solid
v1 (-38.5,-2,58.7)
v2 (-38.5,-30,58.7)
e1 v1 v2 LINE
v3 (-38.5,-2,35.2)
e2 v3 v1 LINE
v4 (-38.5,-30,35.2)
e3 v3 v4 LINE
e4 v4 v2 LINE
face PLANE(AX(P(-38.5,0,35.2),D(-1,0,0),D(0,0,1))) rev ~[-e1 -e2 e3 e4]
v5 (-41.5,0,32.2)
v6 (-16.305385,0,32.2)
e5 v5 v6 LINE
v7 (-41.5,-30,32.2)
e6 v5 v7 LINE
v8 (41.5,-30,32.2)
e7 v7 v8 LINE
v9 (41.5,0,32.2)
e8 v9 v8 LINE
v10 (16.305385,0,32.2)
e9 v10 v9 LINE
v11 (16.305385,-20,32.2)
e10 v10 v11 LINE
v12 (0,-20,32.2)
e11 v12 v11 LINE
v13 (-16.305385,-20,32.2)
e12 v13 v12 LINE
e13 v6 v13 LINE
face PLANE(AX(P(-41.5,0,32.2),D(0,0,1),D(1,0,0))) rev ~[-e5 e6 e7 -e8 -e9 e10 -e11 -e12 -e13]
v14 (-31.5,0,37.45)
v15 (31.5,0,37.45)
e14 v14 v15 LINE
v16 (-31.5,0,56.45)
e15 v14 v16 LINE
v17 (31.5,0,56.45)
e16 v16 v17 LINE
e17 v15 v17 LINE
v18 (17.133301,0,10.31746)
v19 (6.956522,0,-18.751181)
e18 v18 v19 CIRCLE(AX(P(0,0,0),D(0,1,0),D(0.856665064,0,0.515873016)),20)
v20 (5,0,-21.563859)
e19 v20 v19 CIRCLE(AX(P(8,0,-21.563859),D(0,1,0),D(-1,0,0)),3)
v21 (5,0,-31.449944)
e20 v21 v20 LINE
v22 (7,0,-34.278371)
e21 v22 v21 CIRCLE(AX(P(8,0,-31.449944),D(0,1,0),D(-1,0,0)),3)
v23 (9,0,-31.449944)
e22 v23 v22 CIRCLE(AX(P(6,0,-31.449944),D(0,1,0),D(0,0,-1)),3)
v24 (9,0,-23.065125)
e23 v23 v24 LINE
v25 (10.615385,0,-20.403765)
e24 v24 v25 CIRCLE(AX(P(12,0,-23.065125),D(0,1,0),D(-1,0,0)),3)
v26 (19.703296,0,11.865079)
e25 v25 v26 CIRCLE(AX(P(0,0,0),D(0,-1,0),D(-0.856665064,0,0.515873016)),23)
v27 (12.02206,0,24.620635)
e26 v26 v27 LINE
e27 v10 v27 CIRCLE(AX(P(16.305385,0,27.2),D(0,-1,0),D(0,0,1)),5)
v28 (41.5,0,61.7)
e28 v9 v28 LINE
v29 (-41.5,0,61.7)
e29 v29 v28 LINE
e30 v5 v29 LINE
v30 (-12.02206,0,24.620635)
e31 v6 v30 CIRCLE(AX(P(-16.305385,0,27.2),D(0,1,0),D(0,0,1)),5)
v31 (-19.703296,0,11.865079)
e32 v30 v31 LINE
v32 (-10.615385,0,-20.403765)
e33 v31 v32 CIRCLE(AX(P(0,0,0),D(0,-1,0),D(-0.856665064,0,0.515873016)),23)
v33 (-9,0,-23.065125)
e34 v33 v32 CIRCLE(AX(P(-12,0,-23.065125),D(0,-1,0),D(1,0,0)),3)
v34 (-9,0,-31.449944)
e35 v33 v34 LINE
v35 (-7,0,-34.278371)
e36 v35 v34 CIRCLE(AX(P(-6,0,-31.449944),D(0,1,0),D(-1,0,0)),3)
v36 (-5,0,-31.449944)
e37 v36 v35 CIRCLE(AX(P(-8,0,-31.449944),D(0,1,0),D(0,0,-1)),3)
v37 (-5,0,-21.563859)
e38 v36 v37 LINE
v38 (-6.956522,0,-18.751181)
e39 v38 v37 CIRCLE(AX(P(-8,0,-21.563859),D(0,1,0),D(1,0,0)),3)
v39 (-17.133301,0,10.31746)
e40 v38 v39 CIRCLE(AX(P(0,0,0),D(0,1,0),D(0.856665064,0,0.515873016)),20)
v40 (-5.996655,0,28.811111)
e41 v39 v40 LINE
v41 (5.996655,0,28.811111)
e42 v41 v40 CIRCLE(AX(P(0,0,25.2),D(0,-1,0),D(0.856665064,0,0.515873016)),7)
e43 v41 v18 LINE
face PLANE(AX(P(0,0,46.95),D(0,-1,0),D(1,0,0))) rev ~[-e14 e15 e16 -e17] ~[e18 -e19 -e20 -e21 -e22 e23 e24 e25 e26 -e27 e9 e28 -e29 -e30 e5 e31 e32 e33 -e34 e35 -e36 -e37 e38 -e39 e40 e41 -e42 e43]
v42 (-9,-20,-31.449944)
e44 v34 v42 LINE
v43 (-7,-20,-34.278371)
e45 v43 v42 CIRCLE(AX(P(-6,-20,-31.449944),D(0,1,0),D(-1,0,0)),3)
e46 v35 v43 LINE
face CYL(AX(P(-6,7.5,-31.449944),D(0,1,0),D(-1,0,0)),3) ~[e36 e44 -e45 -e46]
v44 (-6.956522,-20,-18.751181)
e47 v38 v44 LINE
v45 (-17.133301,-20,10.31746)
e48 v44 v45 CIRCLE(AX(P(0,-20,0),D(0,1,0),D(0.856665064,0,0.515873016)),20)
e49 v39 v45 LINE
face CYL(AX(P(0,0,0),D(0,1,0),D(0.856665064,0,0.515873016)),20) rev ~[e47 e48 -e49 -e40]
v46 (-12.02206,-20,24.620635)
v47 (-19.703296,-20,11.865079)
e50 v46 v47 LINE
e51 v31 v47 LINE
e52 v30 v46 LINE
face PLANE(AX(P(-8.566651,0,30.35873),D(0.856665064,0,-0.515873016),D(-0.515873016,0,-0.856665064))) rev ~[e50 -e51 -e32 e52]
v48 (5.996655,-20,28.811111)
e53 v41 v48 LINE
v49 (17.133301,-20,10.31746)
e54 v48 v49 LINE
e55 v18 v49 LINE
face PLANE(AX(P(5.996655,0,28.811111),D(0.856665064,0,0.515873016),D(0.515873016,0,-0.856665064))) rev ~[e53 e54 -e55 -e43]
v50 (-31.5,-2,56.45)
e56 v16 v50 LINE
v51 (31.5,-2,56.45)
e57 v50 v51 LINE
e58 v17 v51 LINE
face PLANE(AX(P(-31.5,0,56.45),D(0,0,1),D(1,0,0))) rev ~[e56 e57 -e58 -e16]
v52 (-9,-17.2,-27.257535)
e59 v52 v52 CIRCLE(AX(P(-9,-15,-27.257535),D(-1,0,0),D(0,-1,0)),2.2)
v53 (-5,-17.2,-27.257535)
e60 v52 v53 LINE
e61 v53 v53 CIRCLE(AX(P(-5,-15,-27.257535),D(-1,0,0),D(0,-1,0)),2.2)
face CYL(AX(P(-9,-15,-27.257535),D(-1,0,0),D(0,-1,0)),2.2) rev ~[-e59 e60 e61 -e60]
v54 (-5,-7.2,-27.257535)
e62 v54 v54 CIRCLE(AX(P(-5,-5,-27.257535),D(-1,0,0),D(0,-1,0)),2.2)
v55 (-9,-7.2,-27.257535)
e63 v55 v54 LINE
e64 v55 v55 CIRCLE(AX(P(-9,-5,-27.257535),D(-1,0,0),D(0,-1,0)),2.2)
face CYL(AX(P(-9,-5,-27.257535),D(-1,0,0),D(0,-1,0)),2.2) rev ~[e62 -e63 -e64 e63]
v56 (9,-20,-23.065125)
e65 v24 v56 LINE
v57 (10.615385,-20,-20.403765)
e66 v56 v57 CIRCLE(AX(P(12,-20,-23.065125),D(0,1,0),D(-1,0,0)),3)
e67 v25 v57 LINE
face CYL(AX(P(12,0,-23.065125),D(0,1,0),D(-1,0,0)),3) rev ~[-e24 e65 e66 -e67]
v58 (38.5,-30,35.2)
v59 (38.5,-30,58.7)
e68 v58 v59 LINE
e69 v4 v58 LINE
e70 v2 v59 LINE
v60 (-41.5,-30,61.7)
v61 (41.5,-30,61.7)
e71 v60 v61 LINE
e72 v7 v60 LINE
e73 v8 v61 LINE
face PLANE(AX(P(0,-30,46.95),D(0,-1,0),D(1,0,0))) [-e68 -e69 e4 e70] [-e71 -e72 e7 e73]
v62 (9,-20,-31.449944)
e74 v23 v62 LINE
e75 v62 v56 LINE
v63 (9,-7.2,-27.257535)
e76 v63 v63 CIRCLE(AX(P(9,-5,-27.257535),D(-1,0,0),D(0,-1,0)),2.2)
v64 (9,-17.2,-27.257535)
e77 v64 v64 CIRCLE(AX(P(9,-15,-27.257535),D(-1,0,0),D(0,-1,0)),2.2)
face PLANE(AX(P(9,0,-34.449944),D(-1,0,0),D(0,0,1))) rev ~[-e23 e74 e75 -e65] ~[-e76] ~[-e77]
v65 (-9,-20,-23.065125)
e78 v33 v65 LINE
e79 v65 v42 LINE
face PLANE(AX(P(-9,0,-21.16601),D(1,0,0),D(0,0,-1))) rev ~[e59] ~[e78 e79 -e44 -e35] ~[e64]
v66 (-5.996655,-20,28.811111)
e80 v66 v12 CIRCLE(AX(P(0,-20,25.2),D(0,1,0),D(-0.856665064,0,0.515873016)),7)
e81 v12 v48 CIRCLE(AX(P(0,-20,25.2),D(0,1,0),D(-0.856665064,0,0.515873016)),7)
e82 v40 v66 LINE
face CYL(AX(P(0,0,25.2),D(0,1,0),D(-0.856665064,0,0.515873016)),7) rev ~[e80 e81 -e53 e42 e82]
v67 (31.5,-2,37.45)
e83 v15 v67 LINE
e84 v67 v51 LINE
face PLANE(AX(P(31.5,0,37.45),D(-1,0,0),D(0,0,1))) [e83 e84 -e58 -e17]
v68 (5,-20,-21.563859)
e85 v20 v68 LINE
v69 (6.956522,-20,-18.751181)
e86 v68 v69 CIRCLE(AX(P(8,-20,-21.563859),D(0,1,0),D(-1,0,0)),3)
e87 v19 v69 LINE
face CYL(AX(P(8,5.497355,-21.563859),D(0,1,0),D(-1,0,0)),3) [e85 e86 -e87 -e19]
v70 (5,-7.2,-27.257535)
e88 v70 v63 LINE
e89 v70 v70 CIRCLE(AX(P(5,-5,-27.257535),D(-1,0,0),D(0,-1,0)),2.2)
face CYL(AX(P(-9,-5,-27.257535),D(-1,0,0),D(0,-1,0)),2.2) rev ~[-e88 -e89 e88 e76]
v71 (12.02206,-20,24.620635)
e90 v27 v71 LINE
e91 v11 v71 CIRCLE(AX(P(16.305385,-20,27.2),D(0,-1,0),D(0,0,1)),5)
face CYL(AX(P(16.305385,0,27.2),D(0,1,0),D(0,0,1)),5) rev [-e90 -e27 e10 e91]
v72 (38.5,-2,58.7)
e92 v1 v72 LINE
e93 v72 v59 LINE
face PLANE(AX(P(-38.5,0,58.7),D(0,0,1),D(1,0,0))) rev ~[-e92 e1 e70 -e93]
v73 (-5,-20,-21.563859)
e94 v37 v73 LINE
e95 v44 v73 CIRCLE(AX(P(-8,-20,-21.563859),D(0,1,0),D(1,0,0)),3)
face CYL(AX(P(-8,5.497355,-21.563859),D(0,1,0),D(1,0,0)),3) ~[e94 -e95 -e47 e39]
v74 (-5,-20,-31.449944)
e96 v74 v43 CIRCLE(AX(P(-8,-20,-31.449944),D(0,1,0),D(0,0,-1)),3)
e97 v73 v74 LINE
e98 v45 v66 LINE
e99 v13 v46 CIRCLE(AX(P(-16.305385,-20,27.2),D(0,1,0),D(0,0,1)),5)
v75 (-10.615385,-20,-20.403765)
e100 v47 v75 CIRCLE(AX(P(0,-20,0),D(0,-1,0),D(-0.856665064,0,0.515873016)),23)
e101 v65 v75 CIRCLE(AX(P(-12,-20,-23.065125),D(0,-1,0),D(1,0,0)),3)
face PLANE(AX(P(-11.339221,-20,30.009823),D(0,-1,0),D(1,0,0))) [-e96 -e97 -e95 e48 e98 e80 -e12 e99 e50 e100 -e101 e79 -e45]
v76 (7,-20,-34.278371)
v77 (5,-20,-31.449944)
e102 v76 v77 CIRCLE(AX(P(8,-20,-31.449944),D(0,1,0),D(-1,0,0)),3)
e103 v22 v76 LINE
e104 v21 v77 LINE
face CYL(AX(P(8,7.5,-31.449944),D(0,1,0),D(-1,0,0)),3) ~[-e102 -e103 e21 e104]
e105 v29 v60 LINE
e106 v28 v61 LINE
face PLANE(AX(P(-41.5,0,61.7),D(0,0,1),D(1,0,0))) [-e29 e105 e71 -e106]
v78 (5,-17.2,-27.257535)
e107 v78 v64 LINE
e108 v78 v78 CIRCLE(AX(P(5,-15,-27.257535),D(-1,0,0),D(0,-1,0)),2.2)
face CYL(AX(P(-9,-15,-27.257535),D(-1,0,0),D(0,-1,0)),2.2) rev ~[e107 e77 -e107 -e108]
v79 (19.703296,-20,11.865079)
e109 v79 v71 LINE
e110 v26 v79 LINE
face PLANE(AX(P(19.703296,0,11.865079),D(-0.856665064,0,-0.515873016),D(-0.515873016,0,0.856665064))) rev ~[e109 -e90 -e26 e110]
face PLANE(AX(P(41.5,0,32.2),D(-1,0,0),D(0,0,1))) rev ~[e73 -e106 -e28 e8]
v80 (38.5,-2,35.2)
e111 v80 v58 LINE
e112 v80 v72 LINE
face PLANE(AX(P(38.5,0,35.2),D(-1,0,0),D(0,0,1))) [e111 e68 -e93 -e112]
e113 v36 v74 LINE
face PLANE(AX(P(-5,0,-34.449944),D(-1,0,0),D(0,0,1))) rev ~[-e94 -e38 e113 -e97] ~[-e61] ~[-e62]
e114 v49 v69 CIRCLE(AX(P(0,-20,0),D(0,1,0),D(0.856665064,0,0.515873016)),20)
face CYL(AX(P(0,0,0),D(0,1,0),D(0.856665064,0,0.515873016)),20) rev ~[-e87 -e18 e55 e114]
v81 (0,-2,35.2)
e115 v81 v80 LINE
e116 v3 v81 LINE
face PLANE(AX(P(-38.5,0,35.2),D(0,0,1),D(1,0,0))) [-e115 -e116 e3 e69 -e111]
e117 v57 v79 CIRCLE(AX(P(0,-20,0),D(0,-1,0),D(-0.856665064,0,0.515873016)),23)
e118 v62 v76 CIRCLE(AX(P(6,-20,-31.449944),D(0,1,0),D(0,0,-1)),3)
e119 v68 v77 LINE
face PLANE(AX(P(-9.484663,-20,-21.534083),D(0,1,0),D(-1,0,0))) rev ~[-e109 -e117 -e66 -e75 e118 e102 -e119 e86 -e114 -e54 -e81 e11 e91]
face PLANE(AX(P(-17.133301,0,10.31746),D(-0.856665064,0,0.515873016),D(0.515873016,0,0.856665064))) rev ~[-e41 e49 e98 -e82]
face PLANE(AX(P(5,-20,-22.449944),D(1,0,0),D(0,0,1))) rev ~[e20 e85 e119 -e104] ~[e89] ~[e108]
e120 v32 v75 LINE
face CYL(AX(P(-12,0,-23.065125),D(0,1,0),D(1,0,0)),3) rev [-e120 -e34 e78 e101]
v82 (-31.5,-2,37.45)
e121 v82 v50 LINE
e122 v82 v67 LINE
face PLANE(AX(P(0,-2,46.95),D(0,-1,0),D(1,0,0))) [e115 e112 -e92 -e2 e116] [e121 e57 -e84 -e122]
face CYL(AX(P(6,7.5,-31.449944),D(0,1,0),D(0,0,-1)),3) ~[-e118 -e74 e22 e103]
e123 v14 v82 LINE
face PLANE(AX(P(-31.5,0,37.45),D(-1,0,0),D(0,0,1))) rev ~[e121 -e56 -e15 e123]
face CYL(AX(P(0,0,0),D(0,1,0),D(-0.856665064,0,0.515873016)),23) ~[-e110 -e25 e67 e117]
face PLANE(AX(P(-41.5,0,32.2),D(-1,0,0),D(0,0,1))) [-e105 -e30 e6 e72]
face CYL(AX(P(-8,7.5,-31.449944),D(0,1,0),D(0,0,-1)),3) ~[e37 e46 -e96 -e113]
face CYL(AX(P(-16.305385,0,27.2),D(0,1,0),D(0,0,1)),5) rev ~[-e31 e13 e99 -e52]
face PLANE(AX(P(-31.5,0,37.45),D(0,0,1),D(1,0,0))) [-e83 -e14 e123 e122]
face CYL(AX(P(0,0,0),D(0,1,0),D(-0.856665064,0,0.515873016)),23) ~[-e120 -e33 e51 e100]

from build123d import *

# Parameters (mm, degrees)
F1_DEPTH    = 20
F3_DEPTH    = 20.001
F5_DEPTH    = 20
F6_T1_DEPTH = 20
F6_T3_DEPTH = 30.9947096091
F6_T5_DEPTH = 35
F7_W        = 83
F7_H        = 29.5
F7_W_2      = 77
F7_H_2      = 23.5
F8_DEPTH    = 30
F9_T1_DEPTH = 20
F10_R       = 2.2
F11_DEPTH   = 50.501
F12_W       = 77
F12_H       = 23.5
F12_W_2     = 63
F12_H_2     = 19
F13_DEPTH   = 2


# Not quite as in the source:
# - a fillet or chamfer that OpenCascade refuses, or shapes differently, is made with other operations: its cross-section is extruded or revolved along the edge and cut away or added


with BuildPart() as f1:
    # F0 (on Front) → F1 (new body)
    with BuildSketch(Plane.XZ):
        with BuildLine():
            ThreePointArc((8.5666506378, 30.3587301587), (0, 35.2), (-8.5666506378, 30.3587301587))
            Line((-8.5666506378, 30.3587301587), (-19.7032964668, 11.8650793651))
            ThreePointArc((-19.7032964668, 11.8650793651), (0, -23), (19.7032964668, 11.8650793651))
            Line((19.7032964668, 11.8650793651), (8.5666506378, 30.3587301587))
        make_face()
        with BuildLine():
            ThreePointArc((17.1333012755, 10.3174603175), (0, -20), (-17.1333012755, 10.3174603175))
            Line((-17.1333012755, 10.3174603175), (-5.9966554464, 28.8111111111))
            ThreePointArc((-5.9966554464, 28.8111111111), (0, 32.2), (5.9966554464, 28.8111111111))
            Line((5.9966554464, 28.8111111111), (17.1333012755, 10.3174603175))
        make_face(mode=Mode.SUBTRACT)
    extrude(amount=F1_DEPTH)

    # F2 (on face) → F3 (cut, through all)
    with BuildSketch(Plane.XZ.offset(20)):
        with BuildLine():
            ThreePointArc((5, -19.364916731), (0, -20), (-5, -19.364916731))
            Line((-5, -19.364916731), (-5, -22.4499443206))
            ThreePointArc((-5, -22.4499443206), (0, -23), (5, -22.4499443206))
            Line((5, -22.4499443206), (5, -19.364916731))
        make_face()
    extrude(amount=-F3_DEPTH, mode=Mode.SUBTRACT)

    # F4 (on Front) → F5 (join, through all)
    with BuildSketch(Plane.XZ):
        Polygon((-5, -34.4499443206), (-5, -22.4499443206), (-9, -21.1660104885), (-9, -34.4499443206), align=None)
        Polygon((5, -34.4499443206), (9, -34.4499443206), (9, -21.1660104885), (5, -22.4499443206), align=None)
    extrude(amount=F5_DEPTH)

    # F6: fillet of radius 3 on 8 edges, made by hand

    # F6_s2 → F6_t1 (join)
    with BuildSketch(Plane.XZ):
        with BuildLine():
            ThreePointArc((-9, -23.0651251893), (-9.4354487572, -21.5085016244), (-10.6153846154, -20.4037645906))
            ThreePointArc((-10.6153846154, -20.4037645906), (-9.8150946559, -20.8005749174), (-9, -21.1660104885))
            Line((-9, -21.1660104885), (-9, -23.0651251893))
        make_face()
        with BuildLine():
            ThreePointArc((9, -23.0651251893), (9.4354487572, -21.5085016244), (10.6153846154, -20.4037645906))
            ThreePointArc((10.6153846154, -20.4037645906), (9.8150946559, -20.8005749174), (9, -21.1660104885))
            Line((9, -21.1660104885), (9, -23.0651251893))
        make_face()
    extrude(amount=F6_T1_DEPTH)

    # F6_s4 → F6_t3 (cut)
    with BuildSketch(Plane.XZ.offset(-5.4973548045)):
        with BuildLine():
            ThreePointArc((-5, -21.5638586528), (-5.5372337928, -19.8507379307), (-6.9565217391, -18.7511814373))
            ThreePointArc((-6.9565217391, -18.7511814373), (-5.9861315369, -19.0831399204), (-5, -19.364916731))
            Line((-5, -19.364916731), (-5, -21.5638586528))
        make_face()
        with BuildLine():
            ThreePointArc((5, -21.5638586528), (5.5372337928, -19.8507379307), (6.9565217391, -18.7511814373))
            ThreePointArc((6.9565217391, -18.7511814373), (5.9861315369, -19.0831399204), (5, -19.364916731))
            Line((5, -19.364916731), (5, -21.5638586528))
        make_face()
    extrude(amount=F6_T3_DEPTH, mode=Mode.SUBTRACT)

    # F6_s6 → F6_t5 (cut)
    with BuildSketch(Plane.XZ.offset(-7.5)):
        with BuildLine():
            ThreePointArc((-8, -34.4499443206), (-5.8786796564, -33.5712646642), (-5, -31.4499443206))
            Line((-5, -31.4499443206), (-5, -34.4499443206))
            Line((-5, -34.4499443206), (-8, -34.4499443206))
        make_face()
        with BuildLine():
            ThreePointArc((5, -31.4499443206), (5.8786796564, -33.5712646642), (8, -34.4499443206))
            Line((8, -34.4499443206), (5, -34.4499443206))
            Line((5, -34.4499443206), (5, -31.4499443206))
        make_face()
        with BuildLine():
            ThreePointArc((6, -34.4499443206), (8.1213203436, -33.5712646642), (9, -31.4499443206))
            Line((9, -31.4499443206), (9, -34.4499443206))
            Line((9, -34.4499443206), (6, -34.4499443206))
        make_face()
        with BuildLine():
            ThreePointArc((-9, -31.4499443206), (-8.1213203436, -33.5712646642), (-6, -34.4499443206))
            Line((-6, -34.4499443206), (-9, -34.4499443206))
            Line((-9, -34.4499443206), (-9, -31.4499443206))
        make_face()
    extrude(amount=F6_T5_DEPTH, mode=Mode.SUBTRACT)

    # F7 (on Front) → F8 (join)
    with BuildSketch(Plane.XZ):
        with Locations((0, 46.95)):
            Rectangle(F7_W, F7_H)
        with Locations((0, 46.95)):
            Rectangle(F7_W_2, F7_H_2, mode=Mode.SUBTRACT)
    extrude(amount=F8_DEPTH)

    # F9: fillet of radius 5 on 2 edges, made by hand

    # F9_s2 → F9_t1 (join)
    with BuildSketch(Plane.XZ):
        with BuildLine():
            ThreePointArc((-16.3053853354, 32.2), (-11.9524078833, 29.659997419), (-12.0220600165, 24.6206349206))
            Line((-12.0220600165, 24.6206349206), (-11.5937274846, 24.3626984127))
            ThreePointArc((-11.5937274846, 24.3626984127), (-8.1383181059, 30.1007936508), (-6.7843570071, 31.85))
            Line((-6.7843570071, 31.85), (-7.1414284285, 32.7))
            Line((-7.1414284285, 32.7), (-16.3053853354, 32.7))
            Line((-16.3053853354, 32.7), (-16.3053853354, 32.2))
        make_face()
        with BuildLine():
            ThreePointArc((16.3053853354, 32.2), (11.9524078833, 29.659997419), (12.0220600165, 24.6206349206))
            Line((12.0220600165, 24.6206349206), (11.5937274846, 24.3626984127))
            ThreePointArc((11.5937274846, 24.3626984127), (8.1383181059, 30.1007936508), (6.7843570071, 31.85))
            Line((6.7843570071, 31.85), (7.1414284285, 32.7))
            Line((7.1414284285, 32.7), (16.3053853354, 32.7))
            Line((16.3053853354, 32.7), (16.3053853354, 32.2))
        make_face()
    extrude(amount=F9_T1_DEPTH)

    # F10 (on face) → F11 (cut, through all)
    with BuildSketch(Plane(origin=(-9, 0, 0), x_dir=(0, -1, 0), z_dir=(-1, 0, 0))):
        with Locations((5, -27.257534755)):
            Circle(F10_R)
        with Locations((15, -27.257534755)):
            Circle(F10_R)
    extrude(amount=-F11_DEPTH, mode=Mode.SUBTRACT)

    # F12 (on Front) → F13 (join)
    with BuildSketch(Plane.XZ):
        with Locations((0, 46.95)):
            Rectangle(F12_W, F12_H)
        with Locations((0, 46.95)):
            Rectangle(F12_W_2, F12_H_2, mode=Mode.SUBTRACT)
    extrude(amount=F13_DEPTH)


solid = f1.part
